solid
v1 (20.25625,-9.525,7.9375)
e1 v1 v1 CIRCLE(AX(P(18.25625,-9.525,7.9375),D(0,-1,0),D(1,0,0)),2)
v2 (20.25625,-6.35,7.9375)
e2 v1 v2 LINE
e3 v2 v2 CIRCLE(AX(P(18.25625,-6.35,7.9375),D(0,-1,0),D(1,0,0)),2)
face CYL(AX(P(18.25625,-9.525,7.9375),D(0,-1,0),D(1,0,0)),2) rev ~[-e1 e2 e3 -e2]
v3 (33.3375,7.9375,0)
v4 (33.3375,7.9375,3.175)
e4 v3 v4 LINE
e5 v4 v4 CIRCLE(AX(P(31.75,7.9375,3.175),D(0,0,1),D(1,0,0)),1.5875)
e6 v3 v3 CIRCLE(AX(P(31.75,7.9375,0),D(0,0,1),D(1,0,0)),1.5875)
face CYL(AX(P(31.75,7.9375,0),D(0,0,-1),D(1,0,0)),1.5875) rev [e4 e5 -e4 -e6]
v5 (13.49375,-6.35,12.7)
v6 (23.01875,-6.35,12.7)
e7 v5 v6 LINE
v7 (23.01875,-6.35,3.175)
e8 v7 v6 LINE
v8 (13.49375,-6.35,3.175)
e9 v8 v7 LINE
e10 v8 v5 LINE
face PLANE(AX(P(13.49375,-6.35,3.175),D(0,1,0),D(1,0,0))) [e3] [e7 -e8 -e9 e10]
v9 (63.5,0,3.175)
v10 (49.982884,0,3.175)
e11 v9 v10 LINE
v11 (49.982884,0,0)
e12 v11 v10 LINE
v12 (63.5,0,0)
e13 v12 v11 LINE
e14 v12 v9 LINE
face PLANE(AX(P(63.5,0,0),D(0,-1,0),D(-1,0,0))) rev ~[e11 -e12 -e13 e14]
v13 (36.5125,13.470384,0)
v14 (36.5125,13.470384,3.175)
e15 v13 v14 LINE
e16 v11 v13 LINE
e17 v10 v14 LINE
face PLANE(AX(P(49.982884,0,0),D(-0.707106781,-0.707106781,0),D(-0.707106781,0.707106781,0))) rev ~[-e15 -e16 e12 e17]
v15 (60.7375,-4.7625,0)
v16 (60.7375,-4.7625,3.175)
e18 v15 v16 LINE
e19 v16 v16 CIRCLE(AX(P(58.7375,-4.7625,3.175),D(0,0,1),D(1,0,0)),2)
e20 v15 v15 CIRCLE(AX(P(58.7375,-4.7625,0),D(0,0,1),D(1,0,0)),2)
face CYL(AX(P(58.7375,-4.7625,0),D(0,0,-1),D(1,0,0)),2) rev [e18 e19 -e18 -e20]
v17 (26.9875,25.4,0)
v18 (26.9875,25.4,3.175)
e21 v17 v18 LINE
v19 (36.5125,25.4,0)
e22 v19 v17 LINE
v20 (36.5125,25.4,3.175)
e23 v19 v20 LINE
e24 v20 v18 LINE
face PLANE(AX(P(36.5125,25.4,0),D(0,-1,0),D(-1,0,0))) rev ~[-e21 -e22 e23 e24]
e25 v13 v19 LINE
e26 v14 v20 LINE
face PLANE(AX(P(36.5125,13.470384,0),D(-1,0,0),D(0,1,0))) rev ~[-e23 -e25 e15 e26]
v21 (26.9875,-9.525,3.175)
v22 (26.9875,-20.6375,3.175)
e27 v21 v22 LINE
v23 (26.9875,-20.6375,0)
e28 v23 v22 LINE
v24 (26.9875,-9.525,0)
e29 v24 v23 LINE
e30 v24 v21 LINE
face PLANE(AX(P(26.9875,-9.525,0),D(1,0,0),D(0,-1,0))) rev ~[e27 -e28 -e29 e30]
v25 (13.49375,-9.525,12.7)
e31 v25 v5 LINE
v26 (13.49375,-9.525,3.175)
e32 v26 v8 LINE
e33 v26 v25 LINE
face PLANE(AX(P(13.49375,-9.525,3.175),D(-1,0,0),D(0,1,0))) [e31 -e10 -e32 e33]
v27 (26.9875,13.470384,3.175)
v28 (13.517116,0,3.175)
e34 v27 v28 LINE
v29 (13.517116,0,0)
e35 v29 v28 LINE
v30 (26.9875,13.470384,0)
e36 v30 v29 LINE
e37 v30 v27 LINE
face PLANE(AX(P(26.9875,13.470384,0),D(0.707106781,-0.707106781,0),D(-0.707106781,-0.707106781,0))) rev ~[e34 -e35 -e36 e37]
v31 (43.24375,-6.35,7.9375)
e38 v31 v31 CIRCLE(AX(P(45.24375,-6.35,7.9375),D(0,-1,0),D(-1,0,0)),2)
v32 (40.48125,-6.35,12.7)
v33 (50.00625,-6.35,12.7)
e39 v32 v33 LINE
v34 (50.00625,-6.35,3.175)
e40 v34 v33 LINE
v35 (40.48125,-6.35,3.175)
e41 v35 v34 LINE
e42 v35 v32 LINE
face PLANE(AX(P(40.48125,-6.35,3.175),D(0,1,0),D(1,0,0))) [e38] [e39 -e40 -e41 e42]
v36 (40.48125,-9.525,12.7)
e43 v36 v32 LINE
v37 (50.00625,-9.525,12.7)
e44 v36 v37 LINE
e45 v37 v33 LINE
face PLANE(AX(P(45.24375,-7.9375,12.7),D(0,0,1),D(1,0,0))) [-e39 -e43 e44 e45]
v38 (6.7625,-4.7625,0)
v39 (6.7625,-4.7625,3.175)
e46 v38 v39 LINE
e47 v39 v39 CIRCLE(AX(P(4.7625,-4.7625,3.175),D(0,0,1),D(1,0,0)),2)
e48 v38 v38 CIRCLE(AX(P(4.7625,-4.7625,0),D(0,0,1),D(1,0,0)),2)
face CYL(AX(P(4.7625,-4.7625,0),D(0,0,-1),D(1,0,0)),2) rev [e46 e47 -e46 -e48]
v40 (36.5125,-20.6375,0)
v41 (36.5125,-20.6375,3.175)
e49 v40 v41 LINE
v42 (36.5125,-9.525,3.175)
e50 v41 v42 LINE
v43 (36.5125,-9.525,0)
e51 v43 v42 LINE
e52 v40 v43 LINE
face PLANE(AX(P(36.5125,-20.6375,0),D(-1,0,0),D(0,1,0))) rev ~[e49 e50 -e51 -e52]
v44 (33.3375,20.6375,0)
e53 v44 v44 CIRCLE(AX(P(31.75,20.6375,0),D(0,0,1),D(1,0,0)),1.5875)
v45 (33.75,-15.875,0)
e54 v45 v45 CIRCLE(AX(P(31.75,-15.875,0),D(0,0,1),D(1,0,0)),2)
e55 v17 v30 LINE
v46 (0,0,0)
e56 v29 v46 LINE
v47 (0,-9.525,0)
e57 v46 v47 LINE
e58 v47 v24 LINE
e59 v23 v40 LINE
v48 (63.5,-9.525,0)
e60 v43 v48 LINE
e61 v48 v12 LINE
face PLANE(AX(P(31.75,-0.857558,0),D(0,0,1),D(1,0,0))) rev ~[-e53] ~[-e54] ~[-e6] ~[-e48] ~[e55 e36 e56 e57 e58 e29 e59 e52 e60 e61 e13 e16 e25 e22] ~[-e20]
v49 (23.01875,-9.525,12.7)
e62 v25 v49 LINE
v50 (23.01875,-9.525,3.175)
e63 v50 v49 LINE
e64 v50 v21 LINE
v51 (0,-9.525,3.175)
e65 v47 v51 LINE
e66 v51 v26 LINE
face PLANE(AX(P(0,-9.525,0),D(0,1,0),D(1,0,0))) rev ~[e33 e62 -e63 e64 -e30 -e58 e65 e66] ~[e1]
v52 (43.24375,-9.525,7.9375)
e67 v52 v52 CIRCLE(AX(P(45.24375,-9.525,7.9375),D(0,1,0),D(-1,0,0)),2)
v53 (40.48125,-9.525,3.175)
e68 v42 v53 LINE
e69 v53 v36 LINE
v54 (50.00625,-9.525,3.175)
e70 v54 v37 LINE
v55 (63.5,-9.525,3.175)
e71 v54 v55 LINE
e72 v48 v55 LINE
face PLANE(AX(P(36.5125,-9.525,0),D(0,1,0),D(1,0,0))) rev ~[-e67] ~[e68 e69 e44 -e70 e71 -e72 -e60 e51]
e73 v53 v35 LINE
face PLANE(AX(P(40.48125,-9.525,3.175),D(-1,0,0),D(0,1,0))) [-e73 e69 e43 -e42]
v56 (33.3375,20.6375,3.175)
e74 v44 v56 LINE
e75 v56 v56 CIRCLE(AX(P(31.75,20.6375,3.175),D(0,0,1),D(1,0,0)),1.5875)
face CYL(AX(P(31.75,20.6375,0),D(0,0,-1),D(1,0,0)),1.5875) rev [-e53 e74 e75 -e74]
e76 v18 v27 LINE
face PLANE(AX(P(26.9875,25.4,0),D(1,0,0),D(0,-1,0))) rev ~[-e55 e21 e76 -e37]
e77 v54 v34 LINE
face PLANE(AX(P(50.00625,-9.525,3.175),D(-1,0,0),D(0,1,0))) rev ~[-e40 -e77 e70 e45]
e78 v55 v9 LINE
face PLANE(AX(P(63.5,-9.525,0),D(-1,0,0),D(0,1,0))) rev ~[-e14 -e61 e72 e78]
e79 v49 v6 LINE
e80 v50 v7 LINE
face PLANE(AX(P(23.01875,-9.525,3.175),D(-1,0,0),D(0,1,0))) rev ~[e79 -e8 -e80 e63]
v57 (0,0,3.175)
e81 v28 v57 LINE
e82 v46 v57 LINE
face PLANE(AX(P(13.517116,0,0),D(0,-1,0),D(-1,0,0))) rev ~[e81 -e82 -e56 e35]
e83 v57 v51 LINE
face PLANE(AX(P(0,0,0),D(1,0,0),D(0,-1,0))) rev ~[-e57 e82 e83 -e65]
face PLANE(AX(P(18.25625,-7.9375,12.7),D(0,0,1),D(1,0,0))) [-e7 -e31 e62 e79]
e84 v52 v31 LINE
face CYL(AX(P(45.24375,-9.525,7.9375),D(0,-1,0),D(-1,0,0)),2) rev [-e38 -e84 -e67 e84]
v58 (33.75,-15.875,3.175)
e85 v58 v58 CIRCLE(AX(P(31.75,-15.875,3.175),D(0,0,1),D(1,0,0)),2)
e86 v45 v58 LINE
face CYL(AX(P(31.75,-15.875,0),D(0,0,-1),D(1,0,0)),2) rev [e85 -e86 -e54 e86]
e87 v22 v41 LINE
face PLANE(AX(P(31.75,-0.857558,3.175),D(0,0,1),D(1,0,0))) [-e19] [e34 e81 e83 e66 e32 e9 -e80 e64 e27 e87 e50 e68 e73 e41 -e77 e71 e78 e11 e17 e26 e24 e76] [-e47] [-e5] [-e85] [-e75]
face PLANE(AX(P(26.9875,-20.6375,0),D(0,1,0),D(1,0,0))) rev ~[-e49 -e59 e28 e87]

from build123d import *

# Parameters (mm, degrees)
F0_R     = 2
F0_R_2   = 1.5875
F1_DEPTH = 3.175
F2_W     = 9.525
F2_H     = 3.175
F3_DEPTH = 9.525
F4_R     = 2
F5_DEPTH = 34.926


# Not quite as in the source:
# - a length typed as a fraction of an inch, garbled in the dataset ("3 / 203.2 mm" for 3/8 in), is restored
# - a pattern or mirror of a feature is missing from the dataset's text; its kind, count and spacing are read off the source's solid


with BuildPart() as f1:
    # F0 (on Top) → F1 (new body)
    with BuildSketch(Plane.XY):
        Polygon((13.5171158184, 0), (0, 0), (0, -9.525), (26.9875, -9.525), (26.9875, -20.6375), (36.5125, -20.6375), (36.5125, -9.525), (63.5, -9.525), (63.5, 0), (49.9828841816, 0), (36.5125, 13.4703841816), (36.5125, 25.4), (26.9875, 25.4), (26.9875, 13.4703841816), align=None)
        with Locations((4.7625, -4.7625)):
            Circle(F0_R, mode=Mode.SUBTRACT)
        with Locations((31.75, -15.875)):
            Circle(F0_R, mode=Mode.SUBTRACT)
        with Locations((58.7375, -4.7625)):
            Circle(F0_R, mode=Mode.SUBTRACT)
        with Locations((31.75, 7.9375)):
            Circle(F0_R_2, mode=Mode.SUBTRACT)
        with Locations((31.75, 20.6375)):
            Circle(F0_R_2, mode=Mode.SUBTRACT)
    extrude(amount=F1_DEPTH)

    # F2 (on face) → F3 (join)
    with BuildSketch(Plane.XY.offset(3.175)):
        with Locations((18.25625, -7.9375)):
            Rectangle(F2_W, F2_H)
        with Locations((45.24375, -7.9375)):
            Rectangle(F2_W, F2_H)
    extrude(amount=F3_DEPTH)

    # F4 (on face) → F5 (cut, through all)
    with BuildSketch(Plane.XZ.offset(9.525)):
        with Locations((18.25625, 7.9375)):
            Circle(F4_R)
    f5 = extrude(amount=-F5_DEPTH, mode=Mode.SUBTRACT)

    # F5_copies: F5 across plane
    add(f5.mirror(Plane(origin=(31.75, 0, 0), x_dir=(0, 0, 1), z_dir=(1, 0, 0))), mode=Mode.SUBTRACT)


solid = f1.part
